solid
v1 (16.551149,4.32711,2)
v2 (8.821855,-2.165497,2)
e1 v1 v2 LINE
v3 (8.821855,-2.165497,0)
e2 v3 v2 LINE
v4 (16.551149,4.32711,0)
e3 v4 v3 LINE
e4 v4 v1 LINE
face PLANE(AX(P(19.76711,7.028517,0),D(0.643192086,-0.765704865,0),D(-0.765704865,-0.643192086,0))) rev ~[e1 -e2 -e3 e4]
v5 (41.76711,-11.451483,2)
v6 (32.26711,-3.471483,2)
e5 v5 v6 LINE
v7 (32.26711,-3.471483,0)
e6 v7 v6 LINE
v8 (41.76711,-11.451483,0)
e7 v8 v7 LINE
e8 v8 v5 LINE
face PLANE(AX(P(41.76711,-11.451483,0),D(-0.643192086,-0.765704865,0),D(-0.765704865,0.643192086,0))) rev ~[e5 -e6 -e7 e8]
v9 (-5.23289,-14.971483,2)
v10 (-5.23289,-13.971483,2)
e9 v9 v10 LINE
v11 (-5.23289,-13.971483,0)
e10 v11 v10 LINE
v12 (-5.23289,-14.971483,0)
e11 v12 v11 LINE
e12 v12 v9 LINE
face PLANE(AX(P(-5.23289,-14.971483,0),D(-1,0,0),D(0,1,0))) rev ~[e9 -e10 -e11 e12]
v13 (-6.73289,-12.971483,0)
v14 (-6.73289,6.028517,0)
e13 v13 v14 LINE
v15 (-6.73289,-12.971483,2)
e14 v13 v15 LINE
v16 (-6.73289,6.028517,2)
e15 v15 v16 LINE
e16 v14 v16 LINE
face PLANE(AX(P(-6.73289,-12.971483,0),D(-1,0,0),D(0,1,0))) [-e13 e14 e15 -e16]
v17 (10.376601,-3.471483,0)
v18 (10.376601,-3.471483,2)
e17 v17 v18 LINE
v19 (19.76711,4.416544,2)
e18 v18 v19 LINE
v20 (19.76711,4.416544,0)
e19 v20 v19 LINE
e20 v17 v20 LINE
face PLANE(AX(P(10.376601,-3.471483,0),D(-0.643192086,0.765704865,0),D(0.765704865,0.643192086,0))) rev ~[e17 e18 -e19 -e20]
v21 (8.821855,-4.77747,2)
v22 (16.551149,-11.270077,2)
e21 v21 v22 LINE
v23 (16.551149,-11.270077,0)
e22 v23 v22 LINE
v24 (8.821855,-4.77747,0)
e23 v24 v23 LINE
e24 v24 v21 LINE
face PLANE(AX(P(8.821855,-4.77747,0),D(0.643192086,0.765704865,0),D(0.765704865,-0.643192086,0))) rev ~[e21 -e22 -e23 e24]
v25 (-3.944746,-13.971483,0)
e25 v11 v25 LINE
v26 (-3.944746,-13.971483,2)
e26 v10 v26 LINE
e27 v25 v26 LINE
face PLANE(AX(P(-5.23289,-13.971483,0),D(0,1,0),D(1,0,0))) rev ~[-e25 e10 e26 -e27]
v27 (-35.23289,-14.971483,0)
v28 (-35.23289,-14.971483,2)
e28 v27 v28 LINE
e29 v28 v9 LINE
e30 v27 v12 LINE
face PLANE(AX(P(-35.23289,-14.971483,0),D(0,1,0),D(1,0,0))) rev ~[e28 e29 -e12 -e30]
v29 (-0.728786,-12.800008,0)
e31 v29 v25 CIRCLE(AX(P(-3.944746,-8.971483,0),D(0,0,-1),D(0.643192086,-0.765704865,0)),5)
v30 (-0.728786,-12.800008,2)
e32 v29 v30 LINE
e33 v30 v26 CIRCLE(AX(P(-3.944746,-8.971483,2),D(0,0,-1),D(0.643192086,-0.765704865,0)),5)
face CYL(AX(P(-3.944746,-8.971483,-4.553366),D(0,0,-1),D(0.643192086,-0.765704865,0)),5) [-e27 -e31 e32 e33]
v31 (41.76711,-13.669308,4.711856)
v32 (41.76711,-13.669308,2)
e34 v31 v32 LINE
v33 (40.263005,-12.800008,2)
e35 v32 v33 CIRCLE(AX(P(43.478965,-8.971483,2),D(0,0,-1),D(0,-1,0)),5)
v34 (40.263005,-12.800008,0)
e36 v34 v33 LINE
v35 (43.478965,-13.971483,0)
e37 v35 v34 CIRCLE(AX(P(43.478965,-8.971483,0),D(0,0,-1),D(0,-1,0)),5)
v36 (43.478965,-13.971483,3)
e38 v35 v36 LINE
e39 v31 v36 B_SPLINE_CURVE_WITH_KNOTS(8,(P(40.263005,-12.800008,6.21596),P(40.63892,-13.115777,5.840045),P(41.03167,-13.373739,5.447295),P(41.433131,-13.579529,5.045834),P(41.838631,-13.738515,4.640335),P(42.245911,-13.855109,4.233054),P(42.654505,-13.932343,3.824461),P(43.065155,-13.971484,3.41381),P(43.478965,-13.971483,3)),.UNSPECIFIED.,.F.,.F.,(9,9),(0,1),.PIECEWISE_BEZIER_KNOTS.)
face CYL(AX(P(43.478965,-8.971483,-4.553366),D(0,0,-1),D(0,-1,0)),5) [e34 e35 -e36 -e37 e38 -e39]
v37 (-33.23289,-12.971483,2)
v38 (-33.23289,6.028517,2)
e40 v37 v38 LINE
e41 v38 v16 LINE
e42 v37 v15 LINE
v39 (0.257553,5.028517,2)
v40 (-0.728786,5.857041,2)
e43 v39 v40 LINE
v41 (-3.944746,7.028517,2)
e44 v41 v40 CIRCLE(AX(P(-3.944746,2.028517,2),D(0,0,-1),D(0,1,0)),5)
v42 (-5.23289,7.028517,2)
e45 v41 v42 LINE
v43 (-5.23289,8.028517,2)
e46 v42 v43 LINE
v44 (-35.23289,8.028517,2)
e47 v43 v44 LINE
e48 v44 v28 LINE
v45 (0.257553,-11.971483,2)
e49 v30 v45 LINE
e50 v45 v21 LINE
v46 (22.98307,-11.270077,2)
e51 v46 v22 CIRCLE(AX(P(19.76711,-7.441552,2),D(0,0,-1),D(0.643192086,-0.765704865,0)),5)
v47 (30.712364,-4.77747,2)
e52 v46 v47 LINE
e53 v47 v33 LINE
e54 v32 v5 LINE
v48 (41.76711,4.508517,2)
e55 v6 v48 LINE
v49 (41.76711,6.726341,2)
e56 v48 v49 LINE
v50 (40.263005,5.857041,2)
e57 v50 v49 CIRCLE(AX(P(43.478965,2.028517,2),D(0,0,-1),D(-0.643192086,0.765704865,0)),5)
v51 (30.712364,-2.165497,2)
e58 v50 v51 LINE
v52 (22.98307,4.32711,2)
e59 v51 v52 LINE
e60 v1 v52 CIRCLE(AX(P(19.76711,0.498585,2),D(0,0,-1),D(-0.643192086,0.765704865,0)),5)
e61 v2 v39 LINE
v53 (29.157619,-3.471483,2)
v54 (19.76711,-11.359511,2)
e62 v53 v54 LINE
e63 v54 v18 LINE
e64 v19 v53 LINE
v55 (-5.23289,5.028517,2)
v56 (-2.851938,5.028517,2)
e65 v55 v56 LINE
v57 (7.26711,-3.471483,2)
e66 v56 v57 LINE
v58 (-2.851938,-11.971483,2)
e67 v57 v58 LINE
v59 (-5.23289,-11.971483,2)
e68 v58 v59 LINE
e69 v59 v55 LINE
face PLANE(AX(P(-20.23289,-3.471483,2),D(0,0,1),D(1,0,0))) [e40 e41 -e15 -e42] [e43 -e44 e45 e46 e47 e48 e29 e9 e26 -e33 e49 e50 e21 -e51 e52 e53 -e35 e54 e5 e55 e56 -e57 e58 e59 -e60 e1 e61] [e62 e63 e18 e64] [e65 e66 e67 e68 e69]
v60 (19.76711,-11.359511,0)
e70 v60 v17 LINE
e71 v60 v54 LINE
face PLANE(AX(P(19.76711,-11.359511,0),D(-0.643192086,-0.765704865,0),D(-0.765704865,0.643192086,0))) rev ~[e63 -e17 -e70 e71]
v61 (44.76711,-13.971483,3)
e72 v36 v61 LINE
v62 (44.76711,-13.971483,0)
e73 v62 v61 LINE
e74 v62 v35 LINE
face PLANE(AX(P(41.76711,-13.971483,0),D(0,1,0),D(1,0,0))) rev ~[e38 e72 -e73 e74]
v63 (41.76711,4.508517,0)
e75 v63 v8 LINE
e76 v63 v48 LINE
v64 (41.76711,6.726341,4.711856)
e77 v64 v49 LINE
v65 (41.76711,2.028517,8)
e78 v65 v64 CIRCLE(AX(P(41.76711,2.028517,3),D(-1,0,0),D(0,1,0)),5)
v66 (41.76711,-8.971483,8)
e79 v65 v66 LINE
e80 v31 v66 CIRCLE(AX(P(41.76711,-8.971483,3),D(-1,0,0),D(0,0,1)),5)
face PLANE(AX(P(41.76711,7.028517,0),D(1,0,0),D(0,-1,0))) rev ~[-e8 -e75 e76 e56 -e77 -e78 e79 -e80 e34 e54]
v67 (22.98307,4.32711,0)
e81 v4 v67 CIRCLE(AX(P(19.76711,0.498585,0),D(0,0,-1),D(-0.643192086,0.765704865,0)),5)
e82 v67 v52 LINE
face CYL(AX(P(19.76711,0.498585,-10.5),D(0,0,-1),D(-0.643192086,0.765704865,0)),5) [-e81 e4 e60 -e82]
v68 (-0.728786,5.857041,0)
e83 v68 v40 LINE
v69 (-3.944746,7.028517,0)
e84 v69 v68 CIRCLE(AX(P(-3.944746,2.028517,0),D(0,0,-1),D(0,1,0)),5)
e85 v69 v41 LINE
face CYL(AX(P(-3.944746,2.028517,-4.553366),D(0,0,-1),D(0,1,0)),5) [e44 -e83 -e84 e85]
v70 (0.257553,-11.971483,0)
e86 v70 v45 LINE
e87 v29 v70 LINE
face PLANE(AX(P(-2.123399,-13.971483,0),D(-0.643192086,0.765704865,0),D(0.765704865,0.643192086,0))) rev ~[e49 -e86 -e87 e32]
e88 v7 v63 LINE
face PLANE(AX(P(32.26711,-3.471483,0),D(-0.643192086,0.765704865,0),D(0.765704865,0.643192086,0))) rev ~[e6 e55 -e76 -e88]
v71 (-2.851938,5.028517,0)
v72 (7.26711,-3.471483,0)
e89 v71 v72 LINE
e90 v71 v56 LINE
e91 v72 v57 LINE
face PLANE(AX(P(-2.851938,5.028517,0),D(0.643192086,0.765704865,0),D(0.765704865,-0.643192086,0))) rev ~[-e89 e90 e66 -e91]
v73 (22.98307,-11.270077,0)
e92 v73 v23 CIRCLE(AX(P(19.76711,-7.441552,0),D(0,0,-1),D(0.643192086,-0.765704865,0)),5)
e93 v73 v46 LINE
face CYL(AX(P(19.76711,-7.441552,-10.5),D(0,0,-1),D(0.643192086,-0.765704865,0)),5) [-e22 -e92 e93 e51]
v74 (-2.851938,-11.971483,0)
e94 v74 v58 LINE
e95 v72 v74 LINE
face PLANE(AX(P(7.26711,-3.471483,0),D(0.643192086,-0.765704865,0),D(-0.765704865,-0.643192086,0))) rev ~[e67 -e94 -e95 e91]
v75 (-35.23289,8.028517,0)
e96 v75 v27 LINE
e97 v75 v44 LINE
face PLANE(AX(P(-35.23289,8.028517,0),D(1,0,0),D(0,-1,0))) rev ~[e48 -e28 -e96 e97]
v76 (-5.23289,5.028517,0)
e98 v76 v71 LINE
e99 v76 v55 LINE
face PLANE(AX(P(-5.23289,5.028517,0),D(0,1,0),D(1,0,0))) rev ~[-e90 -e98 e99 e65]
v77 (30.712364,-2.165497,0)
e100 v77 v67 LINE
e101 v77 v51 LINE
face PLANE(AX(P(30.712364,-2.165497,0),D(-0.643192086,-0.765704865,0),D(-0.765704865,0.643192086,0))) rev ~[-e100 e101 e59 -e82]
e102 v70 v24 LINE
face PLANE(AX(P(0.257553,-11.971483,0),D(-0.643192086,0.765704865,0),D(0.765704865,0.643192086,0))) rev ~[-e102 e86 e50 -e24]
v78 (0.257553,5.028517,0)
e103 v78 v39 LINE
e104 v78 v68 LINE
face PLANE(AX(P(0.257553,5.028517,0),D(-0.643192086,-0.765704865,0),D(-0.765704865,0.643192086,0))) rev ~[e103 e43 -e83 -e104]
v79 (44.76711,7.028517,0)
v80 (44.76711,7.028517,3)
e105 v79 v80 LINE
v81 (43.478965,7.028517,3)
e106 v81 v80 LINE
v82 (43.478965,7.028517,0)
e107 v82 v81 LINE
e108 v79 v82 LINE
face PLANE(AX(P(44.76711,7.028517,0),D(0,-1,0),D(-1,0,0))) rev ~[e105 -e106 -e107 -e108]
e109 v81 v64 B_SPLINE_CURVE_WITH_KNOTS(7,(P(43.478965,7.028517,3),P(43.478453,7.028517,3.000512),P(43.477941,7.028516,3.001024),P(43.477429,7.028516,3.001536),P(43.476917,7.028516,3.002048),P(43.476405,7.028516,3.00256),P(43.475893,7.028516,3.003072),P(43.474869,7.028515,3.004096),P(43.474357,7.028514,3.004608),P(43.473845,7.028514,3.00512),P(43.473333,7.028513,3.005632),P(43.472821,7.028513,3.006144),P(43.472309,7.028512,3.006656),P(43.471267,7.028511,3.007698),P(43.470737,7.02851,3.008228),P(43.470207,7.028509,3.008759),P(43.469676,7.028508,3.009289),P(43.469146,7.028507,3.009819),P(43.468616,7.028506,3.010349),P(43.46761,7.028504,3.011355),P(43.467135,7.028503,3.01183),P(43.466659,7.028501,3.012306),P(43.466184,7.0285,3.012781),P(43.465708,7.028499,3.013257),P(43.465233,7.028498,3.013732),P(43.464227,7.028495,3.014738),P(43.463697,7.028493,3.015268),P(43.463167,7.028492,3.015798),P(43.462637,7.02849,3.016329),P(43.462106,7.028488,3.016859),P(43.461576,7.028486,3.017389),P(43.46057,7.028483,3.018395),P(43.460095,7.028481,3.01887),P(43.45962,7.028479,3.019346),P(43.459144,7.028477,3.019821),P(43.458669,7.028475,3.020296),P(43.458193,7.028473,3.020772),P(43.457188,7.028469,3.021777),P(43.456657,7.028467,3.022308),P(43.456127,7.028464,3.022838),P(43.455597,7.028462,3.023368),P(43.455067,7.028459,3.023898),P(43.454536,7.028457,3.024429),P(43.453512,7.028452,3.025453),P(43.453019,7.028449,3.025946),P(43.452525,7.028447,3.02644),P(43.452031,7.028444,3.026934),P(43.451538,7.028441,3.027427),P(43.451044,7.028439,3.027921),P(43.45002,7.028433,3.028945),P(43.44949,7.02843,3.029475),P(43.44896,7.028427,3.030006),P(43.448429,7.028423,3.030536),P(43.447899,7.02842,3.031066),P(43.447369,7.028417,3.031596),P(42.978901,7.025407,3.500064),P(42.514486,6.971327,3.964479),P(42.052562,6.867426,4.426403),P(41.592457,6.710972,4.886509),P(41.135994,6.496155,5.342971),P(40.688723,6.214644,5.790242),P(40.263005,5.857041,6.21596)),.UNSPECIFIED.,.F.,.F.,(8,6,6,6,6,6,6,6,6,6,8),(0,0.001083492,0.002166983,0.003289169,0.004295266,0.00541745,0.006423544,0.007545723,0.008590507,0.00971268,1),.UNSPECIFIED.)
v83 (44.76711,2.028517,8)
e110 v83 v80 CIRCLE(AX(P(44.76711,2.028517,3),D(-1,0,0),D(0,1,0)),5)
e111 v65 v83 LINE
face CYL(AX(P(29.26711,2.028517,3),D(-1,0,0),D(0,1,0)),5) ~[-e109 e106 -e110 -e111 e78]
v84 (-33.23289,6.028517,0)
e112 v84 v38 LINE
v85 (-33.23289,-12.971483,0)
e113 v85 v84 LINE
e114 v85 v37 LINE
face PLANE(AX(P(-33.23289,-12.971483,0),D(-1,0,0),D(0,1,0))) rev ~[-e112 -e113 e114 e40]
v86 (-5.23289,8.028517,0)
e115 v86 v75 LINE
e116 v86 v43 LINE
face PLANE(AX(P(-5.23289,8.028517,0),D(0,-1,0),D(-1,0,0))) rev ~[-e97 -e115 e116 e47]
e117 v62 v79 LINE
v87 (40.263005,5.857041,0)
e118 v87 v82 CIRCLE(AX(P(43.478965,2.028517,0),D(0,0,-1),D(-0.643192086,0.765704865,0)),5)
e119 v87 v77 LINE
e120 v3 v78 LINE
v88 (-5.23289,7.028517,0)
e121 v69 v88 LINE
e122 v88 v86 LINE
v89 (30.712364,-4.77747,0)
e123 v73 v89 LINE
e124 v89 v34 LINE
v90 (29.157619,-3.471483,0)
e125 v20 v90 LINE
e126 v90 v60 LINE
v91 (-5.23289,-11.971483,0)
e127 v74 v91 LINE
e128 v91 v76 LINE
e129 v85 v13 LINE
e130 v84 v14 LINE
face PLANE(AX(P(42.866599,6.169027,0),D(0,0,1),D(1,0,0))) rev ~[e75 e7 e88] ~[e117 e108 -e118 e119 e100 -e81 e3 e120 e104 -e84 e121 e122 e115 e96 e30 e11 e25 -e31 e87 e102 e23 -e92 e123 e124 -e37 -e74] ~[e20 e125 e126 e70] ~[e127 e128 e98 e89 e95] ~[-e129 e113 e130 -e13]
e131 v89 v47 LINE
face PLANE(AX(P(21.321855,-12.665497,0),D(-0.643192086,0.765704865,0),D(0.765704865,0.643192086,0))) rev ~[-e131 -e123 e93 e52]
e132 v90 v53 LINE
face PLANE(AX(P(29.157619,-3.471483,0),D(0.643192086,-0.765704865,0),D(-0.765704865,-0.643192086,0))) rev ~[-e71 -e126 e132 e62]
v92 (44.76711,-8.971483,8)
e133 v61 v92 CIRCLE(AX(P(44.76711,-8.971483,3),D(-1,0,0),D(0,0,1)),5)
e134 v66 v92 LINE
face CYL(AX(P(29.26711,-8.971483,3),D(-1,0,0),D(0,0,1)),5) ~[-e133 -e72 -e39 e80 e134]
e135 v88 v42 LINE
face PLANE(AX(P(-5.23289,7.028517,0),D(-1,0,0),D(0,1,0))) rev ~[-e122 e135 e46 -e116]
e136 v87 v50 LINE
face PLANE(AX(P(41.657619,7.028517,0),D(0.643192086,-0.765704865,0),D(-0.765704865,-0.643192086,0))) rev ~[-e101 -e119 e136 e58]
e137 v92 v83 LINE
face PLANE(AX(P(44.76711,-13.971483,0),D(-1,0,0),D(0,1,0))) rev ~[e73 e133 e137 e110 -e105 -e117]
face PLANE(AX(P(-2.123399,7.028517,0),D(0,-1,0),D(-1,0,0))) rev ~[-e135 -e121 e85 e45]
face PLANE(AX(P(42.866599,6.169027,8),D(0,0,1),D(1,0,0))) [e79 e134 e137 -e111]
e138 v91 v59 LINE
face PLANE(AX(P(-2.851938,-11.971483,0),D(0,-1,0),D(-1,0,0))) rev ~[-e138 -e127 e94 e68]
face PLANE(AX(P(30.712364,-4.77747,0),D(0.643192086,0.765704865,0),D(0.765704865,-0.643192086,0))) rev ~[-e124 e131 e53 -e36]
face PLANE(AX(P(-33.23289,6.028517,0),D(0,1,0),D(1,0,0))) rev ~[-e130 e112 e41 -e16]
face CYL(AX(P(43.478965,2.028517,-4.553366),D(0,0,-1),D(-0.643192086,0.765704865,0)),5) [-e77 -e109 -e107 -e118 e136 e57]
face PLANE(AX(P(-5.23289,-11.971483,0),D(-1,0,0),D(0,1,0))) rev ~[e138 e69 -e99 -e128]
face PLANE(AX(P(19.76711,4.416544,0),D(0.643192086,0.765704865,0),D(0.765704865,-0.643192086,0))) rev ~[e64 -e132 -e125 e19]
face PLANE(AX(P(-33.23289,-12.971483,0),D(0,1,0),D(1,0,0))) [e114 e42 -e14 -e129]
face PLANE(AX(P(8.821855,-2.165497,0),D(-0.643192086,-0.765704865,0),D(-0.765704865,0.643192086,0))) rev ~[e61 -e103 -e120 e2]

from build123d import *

# Parameters (mm, degrees)
F0_W        = 26.5
F0_H        = 19
F1_DEPTH    = 2
F2_DEPTH    = 8
F3_T1_DEPTH = 23
F3_T3_DEPTH = 11.1067326603
F3_T5_DEPTH = 28


# Not quite as in the source:
# - a fillet or chamfer that OpenCascade refuses, or shapes differently, is made with other operations: its cross-section is extruded or revolved along the edge and cut away or added


with BuildPart() as f1:
    # F0 (on Top) → F1 (new body)
    with BuildSketch(Plane.XY):
        Polygon((-5.2328903973, 8.0285165012), (-35.2328903973, 8.0285165012), (-35.2328903973, -14.9714834988), (-5.2328903973, -14.9714834988), (-5.2328903973, -13.9714834988), (-5.2328903973, -11.9714834988), (-5.2328903973, 5.0285165012), (-5.2328903973, 7.0285165012), align=None)
        with Locations((-19.9828903973, -3.4714834988)):
            Rectangle(F0_W, F0_H, mode=Mode.SUBTRACT)
        Polygon((-2.8519380164, 5.0285165012), (-5.2328903973, 7.0285165012), (-5.2328903973, 5.0285165012), align=None)
        Polygon((-2.1233994035, 7.0285165012), (-5.2328903973, 7.0285165012), (-2.8519380164, 5.0285165012), (0.2575529774, 5.0285165012), align=None)
        Polygon((0.2575529774, 5.0285165012), (-2.8519380164, 5.0285165012), (7.2671096027, -3.4714834988), (8.8218550996, -2.1654972814), align=None)
        Polygon((-5.2328903973, -11.9714834988), (-5.2328903973, -13.9714834988), (-2.8519380164, -11.9714834988), align=None)
        Polygon((-2.8519380164, -11.9714834988), (-5.2328903973, -13.9714834988), (-2.1233994035, -13.9714834988), (0.2575529774, -11.9714834988), align=None)
        Polygon((8.8218550996, -4.7774697162), (7.2671096027, -3.4714834988), (-2.8519380164, -11.9714834988), (0.2575529774, -11.9714834988), align=None)
        Polygon((8.8218550996, -2.1654972814), (7.2671096027, -3.4714834988), (8.8218550996, -4.7774697162), (10.3766005965, -3.4714834988), align=None)
        Polygon((21.3218550996, 5.7225302838), (19.7671096027, 7.0285165012), (8.8218550996, -2.1654972814), (10.3766005965, -3.4714834988), (19.7671096027, 4.4165440664), align=None)
        Polygon((10.3766005965, -3.4714834988), (8.8218550996, -4.7774697162), (19.7671096027, -13.9714834988), (21.3218550996, -12.6654972814), (19.7671096027, -11.359511064), align=None)
        Polygon((19.7671096027, -11.359511064), (21.3218550996, -12.6654972814), (30.7123641058, -4.7774697162), (29.1576186089, -3.4714834988), align=None)
        Polygon((30.7123641058, -2.1654972814), (21.3218550996, 5.7225302838), (19.7671096027, 4.4165440664), (29.1576186089, -3.4714834988), align=None)
        Polygon((32.2671096027, -3.4714834988), (30.7123641058, -2.1654972814), (29.1576186089, -3.4714834988), (30.7123641058, -4.7774697162), align=None)
        Polygon((41.7671096027, 7.0285165012), (41.6576186089, 7.0285165012), (30.7123641058, -2.1654972814), (32.2671096027, -3.4714834988), (41.7671096027, 4.5085165012), align=None)
        Polygon((30.7123641058, -4.7774697162), (41.6576186089, -13.9714834988), (41.7671096027, -13.9714834988), (41.7671096027, -11.4514834988), (32.2671096027, -3.4714834988), align=None)
    extrude(amount=F1_DEPTH)

    # F0 (on Top) → F2 (join)
    with BuildSketch(Plane.XY):
        Polygon((44.7671096027, 7.0285165012), (41.7671096027, 7.0285165012), (41.7671096027, 4.5085165012), align=None)
        Polygon((44.7671096027, 7.0285165012), (41.7671096027, 4.5085165012), (41.7671096027, -11.4514834988), (44.7671096027, -13.9714834988), align=None)
        Polygon((41.7671096027, -11.4514834988), (41.7671096027, -13.9714834988), (44.7671096027, -13.9714834988), align=None)
    extrude(amount=F2_DEPTH)

    # F3: fillet of radius 5 on 8 edges, made by hand

    # F3_s2 → F3_t1 (cut)
    with BuildSketch(Plane.XY.offset(-10.5)):
        with BuildLine():
            ThreePointArc((22.9830700348, -11.2700767358), (19.7671096027, -12.4415524119), (16.5511491706, -11.2700767358))
            Line((16.5511491706, -11.2700767358), (19.7671096027, -13.9714834988))
            Line((19.7671096027, -13.9714834988), (22.9830700348, -11.2700767358))
        make_face()
        with BuildLine():
            ThreePointArc((16.5511491706, 4.3271097382), (19.7671096027, 5.4985854143), (22.9830700348, 4.3271097382))
            Line((22.9830700348, 4.3271097382), (19.7671096027, 7.0285165012))
            Line((19.7671096027, 7.0285165012), (16.5511491706, 4.3271097382))
        make_face()
    extrude(amount=F3_T1_DEPTH, mode=Mode.SUBTRACT)

    # F3_s4 → F3_t3 (cut)
    with BuildSketch(Plane.XY.offset(-4.5533663301)):
        with BuildLine():
            ThreePointArc((-0.7287855035, -12.8000078228), (-2.2334045932, -13.6694948664), (-3.9447459356, -13.9714834988))
            Line((-3.9447459356, -13.9714834988), (-2.1233994035, -13.9714834988))
            Line((-2.1233994035, -13.9714834988), (-0.7287855035, -12.8000078228))
        make_face()
        with BuildLine():
            ThreePointArc((-3.9447459356, 7.0285165012), (-2.2334045932, 6.7265278688), (-0.7287855035, 5.8570408251))
            Line((-0.7287855035, 5.8570408251), (-2.1233994035, 7.0285165012))
            Line((-2.1233994035, 7.0285165012), (-3.9447459356, 7.0285165012))
        make_face()
        with BuildLine():
            ThreePointArc((40.2630047089, 5.8570408251), (41.7676237986, 6.7265278688), (43.478965141, 7.0285165012))
            Line((43.478965141, 7.0285165012), (41.6576186089, 7.0285165012))
            Line((41.6576186089, 7.0285165012), (40.2630047089, 5.8570408251))
        make_face()
        with BuildLine():
            ThreePointArc((43.478965141, -13.9714834988), (41.7676237986, -13.6694948664), (40.2630047089, -12.8000078228))
            Line((40.2630047089, -12.8000078228), (41.6576186089, -13.9714834988))
            Line((41.6576186089, -13.9714834988), (43.478965141, -13.9714834988))
        make_face()
    extrude(amount=F3_T3_DEPTH, mode=Mode.SUBTRACT)

    # F3_s6 → F3_t5 (cut)
    with BuildSketch(Plane.YZ.offset(29.2671096027)):
        with BuildLine():
            ThreePointArc((-8.9714834988, 8), (-12.5070174047, 6.5355339059), (-13.9714834988, 3))
            Line((-13.9714834988, 3), (-13.9714834988, 8))
            Line((-13.9714834988, 8), (-8.9714834988, 8))
        make_face()
        with BuildLine():
            ThreePointArc((7.0285165012, 3), (5.5640504071, 6.5355339059), (2.0285165012, 8))
            Line((2.0285165012, 8), (7.0285165012, 8))
            Line((7.0285165012, 8), (7.0285165012, 3))
        make_face()
    extrude(amount=F3_T5_DEPTH, mode=Mode.SUBTRACT)


solid = f1.part
